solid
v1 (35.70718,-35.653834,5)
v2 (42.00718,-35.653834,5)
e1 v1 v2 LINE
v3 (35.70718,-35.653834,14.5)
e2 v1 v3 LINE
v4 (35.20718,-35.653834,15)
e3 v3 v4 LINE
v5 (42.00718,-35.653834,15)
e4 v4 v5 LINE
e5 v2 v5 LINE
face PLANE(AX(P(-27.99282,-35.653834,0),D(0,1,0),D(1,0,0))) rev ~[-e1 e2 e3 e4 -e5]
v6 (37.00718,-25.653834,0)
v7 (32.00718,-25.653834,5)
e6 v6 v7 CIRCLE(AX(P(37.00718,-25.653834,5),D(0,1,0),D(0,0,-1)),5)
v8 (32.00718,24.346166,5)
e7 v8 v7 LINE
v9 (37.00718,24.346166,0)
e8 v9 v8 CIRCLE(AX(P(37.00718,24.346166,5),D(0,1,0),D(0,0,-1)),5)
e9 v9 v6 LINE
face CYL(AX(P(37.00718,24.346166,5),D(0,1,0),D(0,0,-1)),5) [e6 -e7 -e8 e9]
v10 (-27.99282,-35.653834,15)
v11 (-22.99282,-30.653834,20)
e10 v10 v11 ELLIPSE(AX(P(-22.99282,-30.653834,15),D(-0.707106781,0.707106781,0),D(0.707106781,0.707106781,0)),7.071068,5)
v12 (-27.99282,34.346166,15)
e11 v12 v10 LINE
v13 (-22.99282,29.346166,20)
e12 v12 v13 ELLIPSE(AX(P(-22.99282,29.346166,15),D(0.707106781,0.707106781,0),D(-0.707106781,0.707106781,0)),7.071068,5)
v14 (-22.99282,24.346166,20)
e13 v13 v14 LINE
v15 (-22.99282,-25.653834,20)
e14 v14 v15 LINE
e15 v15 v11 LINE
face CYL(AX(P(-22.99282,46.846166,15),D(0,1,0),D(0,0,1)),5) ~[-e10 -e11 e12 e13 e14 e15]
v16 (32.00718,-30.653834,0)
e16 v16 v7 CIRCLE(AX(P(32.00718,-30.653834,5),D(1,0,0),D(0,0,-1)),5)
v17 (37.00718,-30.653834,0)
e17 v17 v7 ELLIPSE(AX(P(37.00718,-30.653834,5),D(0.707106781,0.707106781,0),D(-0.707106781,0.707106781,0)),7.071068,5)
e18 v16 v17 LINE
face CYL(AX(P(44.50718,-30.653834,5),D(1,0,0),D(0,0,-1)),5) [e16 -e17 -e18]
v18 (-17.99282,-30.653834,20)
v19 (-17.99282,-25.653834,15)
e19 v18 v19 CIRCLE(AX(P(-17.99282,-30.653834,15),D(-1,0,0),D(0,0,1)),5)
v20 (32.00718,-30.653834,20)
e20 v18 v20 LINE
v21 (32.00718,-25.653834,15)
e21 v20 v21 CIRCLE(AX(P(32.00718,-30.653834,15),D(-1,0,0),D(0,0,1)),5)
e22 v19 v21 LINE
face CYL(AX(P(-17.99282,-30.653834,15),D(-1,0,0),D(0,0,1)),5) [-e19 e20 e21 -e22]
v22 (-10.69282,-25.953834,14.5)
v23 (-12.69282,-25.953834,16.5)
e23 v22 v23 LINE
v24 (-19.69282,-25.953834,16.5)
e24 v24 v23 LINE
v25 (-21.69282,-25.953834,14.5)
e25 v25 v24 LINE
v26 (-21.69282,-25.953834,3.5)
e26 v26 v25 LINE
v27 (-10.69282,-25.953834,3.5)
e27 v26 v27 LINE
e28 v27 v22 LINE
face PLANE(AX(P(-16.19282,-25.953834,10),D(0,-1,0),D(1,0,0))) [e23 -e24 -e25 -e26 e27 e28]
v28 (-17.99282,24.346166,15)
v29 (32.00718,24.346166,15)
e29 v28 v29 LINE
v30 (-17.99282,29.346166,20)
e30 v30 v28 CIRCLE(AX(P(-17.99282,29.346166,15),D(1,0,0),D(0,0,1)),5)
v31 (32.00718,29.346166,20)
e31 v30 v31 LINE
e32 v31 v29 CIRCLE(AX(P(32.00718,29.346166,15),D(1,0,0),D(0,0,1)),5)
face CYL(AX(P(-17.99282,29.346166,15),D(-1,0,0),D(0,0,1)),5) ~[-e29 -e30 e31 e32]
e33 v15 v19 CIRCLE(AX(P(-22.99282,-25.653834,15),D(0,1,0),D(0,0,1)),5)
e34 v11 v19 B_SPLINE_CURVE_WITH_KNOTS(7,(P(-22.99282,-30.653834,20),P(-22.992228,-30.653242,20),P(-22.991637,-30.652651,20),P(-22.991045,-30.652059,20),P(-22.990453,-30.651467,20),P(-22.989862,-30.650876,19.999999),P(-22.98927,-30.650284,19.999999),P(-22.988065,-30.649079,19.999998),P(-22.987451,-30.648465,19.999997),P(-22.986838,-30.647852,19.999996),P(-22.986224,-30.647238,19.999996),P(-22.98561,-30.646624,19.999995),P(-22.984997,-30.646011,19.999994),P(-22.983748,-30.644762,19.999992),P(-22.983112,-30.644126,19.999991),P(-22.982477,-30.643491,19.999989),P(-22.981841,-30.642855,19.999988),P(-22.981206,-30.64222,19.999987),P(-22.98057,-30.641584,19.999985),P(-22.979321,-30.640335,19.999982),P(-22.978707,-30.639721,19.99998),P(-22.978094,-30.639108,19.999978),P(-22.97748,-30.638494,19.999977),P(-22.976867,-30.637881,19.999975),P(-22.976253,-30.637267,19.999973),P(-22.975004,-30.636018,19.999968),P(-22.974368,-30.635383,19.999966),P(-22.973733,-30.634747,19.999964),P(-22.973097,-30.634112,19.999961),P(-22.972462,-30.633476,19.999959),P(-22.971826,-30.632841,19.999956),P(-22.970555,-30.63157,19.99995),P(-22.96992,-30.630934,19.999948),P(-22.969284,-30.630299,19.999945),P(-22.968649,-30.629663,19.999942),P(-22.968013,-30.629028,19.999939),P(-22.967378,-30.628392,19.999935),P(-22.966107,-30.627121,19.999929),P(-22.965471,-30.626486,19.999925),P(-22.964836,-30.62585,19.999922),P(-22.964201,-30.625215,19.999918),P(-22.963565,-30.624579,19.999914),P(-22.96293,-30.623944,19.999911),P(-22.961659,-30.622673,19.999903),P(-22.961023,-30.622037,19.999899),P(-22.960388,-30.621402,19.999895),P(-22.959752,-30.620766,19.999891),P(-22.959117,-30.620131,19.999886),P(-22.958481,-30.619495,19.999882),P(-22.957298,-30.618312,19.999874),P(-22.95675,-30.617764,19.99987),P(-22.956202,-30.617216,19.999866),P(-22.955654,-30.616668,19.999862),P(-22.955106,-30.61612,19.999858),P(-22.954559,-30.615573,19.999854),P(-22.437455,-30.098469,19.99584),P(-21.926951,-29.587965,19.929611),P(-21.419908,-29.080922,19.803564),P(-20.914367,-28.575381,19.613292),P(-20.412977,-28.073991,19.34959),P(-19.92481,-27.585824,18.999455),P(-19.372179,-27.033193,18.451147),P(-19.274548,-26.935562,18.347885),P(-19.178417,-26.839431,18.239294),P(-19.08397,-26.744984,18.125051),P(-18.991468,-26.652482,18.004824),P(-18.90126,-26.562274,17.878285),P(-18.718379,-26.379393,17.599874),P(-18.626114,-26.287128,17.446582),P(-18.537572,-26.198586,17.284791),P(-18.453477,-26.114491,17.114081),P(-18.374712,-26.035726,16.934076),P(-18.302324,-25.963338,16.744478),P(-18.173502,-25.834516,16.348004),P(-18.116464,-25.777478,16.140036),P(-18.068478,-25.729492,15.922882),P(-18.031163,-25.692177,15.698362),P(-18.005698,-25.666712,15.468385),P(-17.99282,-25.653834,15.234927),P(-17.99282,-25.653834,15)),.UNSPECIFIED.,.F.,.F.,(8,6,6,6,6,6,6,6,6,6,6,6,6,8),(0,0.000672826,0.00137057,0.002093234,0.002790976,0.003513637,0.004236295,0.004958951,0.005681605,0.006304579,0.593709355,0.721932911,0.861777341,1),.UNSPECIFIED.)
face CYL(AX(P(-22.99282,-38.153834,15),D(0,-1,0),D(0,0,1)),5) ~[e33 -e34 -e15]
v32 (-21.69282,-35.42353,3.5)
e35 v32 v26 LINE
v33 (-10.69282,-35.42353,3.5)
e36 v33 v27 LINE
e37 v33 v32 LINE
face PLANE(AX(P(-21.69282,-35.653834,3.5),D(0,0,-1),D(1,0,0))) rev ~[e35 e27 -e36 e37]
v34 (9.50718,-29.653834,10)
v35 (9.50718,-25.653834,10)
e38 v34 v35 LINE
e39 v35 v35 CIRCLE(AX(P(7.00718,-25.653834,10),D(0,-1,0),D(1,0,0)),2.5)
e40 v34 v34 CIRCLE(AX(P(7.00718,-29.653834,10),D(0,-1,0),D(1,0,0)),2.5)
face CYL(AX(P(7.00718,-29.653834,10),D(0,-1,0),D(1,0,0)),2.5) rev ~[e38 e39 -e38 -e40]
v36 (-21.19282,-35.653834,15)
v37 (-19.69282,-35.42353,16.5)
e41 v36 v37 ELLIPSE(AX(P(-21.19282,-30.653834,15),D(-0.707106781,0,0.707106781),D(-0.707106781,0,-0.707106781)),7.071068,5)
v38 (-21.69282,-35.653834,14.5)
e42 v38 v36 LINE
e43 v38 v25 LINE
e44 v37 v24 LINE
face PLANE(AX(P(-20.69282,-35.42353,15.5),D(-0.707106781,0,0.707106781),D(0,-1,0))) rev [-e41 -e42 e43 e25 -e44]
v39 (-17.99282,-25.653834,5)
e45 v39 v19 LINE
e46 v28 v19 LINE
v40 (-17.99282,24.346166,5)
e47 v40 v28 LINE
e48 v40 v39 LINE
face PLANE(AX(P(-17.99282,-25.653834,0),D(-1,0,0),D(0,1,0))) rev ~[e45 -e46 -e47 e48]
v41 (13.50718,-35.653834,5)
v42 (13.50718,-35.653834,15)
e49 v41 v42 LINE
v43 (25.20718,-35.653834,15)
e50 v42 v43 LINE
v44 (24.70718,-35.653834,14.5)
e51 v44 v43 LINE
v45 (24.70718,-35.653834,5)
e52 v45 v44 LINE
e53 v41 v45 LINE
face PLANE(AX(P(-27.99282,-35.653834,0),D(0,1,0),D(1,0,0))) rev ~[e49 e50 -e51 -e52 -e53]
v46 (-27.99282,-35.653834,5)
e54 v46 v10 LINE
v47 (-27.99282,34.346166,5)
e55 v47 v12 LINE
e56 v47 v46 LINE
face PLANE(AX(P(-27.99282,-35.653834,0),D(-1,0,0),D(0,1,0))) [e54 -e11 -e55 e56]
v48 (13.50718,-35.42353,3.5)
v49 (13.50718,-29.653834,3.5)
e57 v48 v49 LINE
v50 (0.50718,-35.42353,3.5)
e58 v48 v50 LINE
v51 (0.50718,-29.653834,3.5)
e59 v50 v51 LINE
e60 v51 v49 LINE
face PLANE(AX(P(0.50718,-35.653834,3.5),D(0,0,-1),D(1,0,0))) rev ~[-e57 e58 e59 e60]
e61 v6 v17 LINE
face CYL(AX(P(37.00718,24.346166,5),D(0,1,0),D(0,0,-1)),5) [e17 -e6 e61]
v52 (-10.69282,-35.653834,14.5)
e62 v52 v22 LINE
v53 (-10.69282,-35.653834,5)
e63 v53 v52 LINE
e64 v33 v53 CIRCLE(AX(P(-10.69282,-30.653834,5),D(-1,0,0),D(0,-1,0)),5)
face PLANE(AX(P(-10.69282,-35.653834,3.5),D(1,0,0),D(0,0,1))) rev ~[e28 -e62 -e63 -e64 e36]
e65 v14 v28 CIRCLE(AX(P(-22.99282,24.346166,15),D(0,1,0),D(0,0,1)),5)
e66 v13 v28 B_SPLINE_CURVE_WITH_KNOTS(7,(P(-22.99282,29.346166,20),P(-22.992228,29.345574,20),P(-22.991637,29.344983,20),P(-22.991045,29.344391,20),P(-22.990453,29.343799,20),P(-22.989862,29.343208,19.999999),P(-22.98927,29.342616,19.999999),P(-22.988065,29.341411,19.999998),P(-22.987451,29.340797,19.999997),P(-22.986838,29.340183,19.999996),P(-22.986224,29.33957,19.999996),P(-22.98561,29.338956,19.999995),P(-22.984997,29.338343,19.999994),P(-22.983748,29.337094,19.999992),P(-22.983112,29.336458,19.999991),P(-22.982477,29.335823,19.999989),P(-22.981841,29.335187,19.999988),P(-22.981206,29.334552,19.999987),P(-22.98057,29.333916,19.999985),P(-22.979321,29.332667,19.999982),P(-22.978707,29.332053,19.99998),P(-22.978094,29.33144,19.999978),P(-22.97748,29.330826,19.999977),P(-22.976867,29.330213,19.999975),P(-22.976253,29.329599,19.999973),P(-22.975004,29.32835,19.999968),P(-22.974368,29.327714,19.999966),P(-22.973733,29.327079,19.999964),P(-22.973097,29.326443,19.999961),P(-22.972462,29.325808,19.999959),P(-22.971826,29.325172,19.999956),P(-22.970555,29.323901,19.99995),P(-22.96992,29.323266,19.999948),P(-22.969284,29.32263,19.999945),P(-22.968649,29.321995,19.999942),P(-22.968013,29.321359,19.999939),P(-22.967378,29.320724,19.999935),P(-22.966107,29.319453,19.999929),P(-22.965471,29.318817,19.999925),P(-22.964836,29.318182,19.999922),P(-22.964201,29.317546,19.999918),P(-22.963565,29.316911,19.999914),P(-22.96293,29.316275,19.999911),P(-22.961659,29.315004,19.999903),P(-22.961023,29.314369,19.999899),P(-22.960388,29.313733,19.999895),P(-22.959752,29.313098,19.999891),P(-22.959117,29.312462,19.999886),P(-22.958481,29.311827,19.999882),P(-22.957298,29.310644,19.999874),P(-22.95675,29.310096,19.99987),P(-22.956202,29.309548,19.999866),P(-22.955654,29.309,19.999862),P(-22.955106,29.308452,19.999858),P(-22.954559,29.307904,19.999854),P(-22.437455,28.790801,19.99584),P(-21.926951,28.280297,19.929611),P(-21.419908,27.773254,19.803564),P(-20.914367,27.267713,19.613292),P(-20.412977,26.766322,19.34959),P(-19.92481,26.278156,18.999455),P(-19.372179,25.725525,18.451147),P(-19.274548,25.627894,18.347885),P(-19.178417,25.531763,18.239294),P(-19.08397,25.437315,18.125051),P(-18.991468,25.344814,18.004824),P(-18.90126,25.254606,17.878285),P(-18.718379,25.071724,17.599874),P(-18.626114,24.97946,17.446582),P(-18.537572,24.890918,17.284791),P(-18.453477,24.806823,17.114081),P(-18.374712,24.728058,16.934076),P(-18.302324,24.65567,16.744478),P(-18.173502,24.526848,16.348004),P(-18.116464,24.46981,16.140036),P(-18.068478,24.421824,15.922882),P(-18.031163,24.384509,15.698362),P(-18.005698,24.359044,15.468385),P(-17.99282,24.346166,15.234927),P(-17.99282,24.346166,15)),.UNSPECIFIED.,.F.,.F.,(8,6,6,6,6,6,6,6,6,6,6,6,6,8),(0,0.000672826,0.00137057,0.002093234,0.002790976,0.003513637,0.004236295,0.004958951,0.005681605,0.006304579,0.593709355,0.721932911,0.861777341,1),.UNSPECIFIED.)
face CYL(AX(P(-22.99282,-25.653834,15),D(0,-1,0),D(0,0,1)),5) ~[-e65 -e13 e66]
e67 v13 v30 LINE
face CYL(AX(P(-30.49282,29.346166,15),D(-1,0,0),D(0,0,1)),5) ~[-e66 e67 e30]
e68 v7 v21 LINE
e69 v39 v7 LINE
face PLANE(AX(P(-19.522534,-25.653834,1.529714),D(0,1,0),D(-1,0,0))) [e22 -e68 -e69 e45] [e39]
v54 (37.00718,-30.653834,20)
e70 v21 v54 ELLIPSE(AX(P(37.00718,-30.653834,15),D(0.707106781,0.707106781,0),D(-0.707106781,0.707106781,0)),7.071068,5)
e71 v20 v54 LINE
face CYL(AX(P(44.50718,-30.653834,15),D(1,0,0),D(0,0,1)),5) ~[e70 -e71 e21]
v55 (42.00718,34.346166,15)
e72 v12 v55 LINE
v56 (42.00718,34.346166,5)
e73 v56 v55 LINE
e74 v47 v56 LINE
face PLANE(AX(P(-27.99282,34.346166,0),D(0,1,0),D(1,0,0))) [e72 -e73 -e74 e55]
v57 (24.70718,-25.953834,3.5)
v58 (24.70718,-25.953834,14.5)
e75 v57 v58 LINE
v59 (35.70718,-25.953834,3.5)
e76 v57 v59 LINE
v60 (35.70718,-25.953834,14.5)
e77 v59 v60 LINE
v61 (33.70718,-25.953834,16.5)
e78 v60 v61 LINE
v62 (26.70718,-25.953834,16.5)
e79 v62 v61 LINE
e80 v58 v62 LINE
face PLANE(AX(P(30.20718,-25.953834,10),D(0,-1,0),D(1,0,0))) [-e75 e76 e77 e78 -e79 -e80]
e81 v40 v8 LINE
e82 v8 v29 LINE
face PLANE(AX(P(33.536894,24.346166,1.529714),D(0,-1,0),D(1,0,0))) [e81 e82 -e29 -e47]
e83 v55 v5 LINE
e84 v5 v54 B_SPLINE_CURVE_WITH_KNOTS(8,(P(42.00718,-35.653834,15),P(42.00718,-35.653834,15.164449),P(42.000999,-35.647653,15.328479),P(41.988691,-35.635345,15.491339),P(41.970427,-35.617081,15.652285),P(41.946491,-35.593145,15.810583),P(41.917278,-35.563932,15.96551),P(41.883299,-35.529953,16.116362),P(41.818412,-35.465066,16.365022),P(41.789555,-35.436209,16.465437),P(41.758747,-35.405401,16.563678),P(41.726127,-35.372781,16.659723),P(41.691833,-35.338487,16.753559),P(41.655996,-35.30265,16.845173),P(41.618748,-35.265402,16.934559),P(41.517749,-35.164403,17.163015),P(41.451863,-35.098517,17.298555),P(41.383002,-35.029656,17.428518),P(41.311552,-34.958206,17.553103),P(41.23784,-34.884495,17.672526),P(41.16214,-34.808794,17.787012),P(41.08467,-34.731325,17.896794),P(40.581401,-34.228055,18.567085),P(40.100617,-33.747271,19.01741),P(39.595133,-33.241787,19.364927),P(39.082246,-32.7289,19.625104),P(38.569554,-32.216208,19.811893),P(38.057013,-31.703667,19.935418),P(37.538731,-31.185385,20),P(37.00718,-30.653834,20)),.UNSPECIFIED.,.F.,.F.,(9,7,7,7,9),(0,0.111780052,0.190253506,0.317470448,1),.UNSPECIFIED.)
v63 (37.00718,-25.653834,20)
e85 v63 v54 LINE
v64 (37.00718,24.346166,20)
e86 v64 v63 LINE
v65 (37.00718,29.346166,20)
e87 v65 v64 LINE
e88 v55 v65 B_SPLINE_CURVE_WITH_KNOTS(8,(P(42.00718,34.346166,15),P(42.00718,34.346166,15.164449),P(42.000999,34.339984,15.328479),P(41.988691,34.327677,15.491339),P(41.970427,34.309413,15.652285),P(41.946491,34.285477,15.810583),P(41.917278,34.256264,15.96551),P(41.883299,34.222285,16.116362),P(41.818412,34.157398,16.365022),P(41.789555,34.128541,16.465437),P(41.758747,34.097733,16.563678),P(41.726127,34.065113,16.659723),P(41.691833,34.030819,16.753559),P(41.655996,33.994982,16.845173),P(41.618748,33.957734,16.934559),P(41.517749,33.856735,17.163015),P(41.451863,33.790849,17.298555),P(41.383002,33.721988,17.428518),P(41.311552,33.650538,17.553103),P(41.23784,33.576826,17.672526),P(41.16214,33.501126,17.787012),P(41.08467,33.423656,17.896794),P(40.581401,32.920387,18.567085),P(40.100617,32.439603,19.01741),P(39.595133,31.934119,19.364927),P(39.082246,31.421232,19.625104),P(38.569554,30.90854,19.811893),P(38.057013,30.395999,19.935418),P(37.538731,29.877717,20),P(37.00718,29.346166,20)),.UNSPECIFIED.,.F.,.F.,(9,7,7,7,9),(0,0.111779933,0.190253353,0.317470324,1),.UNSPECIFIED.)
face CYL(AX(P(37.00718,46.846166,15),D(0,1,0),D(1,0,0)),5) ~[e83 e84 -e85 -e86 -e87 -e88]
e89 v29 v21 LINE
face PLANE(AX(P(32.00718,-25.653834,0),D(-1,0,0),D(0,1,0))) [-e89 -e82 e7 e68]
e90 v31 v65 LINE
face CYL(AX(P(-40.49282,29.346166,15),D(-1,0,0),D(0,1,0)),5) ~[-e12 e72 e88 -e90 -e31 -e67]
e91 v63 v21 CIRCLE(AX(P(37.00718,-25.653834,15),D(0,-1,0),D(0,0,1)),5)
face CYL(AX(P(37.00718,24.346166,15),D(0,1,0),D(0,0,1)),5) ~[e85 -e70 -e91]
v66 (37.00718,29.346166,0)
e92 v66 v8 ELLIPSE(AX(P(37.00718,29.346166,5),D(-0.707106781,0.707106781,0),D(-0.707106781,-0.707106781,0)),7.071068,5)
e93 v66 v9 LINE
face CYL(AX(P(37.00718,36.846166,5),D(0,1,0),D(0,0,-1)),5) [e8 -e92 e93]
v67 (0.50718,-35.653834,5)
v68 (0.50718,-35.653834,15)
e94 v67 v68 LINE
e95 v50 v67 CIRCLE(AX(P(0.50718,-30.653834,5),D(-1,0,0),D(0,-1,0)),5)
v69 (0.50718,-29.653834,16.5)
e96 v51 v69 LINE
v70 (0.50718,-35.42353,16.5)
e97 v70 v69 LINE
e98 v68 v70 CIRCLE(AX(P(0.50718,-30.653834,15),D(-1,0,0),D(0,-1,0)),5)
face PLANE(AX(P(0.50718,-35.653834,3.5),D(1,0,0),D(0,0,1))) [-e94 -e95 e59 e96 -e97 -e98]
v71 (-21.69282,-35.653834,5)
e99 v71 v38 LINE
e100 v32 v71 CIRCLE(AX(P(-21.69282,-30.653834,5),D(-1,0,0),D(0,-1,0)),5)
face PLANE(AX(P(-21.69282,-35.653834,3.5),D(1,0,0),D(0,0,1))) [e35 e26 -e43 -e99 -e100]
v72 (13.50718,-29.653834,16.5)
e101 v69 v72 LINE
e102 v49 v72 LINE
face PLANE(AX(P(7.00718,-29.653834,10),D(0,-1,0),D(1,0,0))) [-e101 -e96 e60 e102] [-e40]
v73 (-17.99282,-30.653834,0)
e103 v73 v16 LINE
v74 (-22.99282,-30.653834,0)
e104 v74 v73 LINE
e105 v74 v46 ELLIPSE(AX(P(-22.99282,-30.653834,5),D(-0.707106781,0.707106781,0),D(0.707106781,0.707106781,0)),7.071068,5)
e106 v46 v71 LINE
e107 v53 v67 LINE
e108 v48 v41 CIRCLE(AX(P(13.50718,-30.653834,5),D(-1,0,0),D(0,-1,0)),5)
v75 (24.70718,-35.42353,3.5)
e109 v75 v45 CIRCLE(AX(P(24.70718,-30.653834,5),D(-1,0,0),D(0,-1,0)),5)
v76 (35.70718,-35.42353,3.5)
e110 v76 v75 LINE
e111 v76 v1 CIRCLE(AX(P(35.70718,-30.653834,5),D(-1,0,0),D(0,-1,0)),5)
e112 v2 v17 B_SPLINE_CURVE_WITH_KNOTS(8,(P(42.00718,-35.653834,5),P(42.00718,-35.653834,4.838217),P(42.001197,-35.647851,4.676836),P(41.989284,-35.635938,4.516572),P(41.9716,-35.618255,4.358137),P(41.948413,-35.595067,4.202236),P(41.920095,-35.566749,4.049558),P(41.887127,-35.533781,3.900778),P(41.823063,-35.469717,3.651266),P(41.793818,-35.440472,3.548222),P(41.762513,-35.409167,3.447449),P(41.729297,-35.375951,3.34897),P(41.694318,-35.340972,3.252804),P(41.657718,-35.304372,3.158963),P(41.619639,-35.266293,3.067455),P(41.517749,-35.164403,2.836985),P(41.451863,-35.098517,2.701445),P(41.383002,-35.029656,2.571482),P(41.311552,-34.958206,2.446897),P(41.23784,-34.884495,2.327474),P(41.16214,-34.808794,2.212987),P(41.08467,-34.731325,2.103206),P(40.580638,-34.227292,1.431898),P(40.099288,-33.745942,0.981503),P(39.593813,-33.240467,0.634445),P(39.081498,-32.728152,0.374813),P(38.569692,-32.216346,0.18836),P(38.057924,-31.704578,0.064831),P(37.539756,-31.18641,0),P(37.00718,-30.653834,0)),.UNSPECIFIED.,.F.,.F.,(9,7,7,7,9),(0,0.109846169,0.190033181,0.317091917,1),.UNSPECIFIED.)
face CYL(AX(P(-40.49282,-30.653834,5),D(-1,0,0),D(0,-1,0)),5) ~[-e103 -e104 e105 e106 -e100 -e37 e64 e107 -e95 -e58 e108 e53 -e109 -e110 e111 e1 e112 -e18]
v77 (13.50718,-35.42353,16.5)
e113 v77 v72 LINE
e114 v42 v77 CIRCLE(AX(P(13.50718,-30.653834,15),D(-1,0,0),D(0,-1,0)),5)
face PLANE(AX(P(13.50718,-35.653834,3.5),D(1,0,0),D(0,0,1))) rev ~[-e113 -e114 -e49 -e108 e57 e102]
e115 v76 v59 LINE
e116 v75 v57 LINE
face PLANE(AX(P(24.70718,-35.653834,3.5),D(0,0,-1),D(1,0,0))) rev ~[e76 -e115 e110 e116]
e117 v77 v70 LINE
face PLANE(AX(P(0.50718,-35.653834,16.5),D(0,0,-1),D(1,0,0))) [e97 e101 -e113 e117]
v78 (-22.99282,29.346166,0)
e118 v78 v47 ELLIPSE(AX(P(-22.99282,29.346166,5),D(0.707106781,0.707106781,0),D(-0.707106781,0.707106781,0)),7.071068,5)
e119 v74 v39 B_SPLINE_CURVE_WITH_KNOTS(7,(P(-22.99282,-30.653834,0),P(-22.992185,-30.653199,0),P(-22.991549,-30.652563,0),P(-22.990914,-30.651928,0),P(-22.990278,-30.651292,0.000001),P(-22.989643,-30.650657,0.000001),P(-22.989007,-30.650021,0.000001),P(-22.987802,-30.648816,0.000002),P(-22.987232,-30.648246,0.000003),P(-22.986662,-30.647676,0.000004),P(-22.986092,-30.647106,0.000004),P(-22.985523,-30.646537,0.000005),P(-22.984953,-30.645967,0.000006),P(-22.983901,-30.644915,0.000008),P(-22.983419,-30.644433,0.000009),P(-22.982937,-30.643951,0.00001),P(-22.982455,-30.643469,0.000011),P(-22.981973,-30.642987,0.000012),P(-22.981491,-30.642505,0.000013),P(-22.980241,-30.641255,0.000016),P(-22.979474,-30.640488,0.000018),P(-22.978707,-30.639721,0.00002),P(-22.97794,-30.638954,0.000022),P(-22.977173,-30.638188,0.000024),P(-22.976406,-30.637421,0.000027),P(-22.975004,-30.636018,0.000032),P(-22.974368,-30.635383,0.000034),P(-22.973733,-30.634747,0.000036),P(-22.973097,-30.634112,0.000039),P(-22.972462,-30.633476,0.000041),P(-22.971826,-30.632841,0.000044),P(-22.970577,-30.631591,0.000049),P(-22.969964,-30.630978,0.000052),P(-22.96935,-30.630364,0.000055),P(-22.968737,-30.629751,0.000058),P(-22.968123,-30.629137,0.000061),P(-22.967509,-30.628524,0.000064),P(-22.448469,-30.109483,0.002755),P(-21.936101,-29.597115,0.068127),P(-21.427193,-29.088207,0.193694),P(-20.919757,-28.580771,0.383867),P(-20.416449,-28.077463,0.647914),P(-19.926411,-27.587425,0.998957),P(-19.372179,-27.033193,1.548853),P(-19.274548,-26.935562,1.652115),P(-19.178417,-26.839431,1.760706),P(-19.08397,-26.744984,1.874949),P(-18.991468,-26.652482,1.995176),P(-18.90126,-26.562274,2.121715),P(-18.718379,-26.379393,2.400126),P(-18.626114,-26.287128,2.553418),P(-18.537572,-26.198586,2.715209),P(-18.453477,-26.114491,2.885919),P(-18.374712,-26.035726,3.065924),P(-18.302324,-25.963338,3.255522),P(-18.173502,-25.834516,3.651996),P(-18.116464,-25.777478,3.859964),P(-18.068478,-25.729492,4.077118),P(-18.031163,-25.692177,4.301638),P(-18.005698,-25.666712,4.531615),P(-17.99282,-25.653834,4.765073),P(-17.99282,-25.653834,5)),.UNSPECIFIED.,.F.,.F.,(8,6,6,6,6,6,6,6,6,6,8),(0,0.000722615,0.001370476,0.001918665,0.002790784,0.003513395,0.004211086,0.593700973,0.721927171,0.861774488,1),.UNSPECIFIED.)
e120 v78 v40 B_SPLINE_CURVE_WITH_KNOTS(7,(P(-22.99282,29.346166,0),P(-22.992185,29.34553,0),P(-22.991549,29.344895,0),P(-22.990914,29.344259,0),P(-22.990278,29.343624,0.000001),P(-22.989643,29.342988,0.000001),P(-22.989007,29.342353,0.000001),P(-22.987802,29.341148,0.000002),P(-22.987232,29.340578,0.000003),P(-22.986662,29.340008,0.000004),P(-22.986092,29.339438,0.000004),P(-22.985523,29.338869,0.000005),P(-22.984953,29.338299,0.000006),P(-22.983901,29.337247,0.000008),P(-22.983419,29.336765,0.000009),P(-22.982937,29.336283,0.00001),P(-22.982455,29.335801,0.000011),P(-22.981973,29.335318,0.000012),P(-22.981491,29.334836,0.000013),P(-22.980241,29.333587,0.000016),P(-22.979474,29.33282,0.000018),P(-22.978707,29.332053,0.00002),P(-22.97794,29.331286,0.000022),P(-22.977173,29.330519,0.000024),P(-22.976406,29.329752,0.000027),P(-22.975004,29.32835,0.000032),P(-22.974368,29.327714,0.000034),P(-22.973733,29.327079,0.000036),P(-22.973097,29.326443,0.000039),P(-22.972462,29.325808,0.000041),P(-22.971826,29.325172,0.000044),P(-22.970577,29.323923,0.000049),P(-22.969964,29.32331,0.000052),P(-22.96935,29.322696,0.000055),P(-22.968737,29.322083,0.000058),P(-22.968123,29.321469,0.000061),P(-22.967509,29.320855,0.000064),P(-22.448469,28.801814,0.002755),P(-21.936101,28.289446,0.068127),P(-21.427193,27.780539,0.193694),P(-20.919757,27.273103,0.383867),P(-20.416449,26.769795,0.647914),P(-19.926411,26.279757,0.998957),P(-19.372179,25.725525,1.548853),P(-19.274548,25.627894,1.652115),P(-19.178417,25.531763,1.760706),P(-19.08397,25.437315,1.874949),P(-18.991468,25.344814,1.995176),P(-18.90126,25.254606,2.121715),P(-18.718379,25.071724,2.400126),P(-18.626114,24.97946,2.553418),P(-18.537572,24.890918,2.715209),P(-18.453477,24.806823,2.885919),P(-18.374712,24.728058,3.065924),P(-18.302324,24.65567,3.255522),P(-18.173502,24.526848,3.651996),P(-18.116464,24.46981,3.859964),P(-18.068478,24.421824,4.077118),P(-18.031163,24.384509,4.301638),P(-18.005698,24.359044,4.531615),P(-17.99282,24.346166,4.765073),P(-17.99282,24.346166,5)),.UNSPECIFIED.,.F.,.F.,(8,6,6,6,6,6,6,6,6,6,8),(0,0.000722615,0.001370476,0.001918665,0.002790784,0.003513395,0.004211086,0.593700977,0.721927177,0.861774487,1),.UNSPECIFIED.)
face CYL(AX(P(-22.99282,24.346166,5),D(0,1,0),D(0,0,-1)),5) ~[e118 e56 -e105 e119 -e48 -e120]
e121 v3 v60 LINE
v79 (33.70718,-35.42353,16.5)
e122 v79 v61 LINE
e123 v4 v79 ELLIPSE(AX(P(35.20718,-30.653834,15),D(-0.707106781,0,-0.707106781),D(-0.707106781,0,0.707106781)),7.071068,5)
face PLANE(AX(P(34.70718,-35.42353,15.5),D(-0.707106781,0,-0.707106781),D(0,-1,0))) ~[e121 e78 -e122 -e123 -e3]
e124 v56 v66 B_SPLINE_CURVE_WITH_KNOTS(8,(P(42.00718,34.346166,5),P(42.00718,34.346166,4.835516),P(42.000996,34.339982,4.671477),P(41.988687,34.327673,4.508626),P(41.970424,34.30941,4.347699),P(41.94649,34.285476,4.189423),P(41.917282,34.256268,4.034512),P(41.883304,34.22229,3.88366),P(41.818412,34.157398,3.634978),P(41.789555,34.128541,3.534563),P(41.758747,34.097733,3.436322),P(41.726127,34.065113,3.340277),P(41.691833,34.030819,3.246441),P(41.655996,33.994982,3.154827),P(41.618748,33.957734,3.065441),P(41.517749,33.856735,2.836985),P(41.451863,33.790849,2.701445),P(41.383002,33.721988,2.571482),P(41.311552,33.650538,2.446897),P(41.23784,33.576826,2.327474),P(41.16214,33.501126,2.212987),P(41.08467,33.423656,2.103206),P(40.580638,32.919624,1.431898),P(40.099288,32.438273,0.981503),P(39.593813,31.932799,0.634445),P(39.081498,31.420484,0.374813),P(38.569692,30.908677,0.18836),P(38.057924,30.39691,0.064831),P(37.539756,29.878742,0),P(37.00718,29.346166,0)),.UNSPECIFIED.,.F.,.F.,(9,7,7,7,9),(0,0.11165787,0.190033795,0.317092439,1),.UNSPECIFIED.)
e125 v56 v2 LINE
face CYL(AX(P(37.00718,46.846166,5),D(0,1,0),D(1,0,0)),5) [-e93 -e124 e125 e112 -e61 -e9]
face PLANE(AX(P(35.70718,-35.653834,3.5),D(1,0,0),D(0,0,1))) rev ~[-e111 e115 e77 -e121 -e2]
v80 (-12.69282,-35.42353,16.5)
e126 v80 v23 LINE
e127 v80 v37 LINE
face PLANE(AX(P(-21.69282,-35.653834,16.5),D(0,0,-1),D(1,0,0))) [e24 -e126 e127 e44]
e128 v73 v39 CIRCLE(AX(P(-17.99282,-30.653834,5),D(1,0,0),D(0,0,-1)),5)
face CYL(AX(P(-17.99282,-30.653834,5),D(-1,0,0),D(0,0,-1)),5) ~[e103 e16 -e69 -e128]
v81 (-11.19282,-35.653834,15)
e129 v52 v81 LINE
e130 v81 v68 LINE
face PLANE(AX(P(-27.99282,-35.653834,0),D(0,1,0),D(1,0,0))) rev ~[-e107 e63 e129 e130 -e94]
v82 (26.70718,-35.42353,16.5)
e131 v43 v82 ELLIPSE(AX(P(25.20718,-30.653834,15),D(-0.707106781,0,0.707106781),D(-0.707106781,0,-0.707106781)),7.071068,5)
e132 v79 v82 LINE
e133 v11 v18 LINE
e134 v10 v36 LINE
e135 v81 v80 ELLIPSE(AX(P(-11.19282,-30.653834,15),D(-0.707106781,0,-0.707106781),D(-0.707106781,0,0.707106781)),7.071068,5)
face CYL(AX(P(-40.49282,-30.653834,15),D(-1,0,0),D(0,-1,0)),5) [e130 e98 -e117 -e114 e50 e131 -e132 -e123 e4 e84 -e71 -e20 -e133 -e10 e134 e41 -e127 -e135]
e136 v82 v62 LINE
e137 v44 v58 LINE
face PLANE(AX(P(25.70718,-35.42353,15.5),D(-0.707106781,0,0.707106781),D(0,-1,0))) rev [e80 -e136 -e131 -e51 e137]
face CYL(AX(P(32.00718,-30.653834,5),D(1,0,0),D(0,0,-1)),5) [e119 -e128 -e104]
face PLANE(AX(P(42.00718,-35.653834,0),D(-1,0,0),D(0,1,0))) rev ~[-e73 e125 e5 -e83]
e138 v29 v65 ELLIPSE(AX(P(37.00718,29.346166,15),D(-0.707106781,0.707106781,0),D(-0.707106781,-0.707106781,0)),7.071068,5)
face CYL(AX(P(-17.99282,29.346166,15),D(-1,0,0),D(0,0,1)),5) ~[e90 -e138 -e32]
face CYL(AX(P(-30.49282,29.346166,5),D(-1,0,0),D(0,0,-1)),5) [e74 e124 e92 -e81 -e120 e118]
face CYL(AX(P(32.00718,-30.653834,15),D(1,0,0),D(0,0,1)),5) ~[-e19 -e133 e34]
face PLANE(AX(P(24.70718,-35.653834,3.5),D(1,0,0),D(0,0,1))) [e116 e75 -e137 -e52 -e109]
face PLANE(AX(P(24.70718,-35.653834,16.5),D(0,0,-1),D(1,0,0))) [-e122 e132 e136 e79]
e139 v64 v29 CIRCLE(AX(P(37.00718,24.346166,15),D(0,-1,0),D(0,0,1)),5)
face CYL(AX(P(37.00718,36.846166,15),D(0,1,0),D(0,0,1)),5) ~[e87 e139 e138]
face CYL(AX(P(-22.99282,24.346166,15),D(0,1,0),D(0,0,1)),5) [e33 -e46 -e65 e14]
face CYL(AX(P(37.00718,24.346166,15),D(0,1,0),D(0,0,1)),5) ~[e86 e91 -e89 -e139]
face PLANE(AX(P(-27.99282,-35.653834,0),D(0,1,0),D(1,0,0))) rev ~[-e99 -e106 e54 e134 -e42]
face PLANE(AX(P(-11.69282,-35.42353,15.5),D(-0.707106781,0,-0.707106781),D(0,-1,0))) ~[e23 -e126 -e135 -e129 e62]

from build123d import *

# Parameters (mm, degrees)
F0_W         = 70
F0_H         = 70
F0_W_2       = 50
F0_H_2       = 50
F1_DEPTH     = 20
F2_W         = 13
F2_H         = 13
F3_DEPTH     = 6
F4_T1_DEPTH  = 95
F4_T3_DEPTH  = 95
F4_T5_DEPTH  = 50
F4_T7_DEPTH  = 50
F4_T13_DEPTH = 62.5
F4_T17_DEPTH = 62.5
F4_T24_DEPTH = 62.5
F4_T28_DEPTH = 62.5
F4_T35_DEPTH = 62.5
F4_T39_DEPTH = 62.5
F4_T46_DEPTH = 62.5
F4_T50_DEPTH = 62.5
F4_T57_DEPTH = 62.5
F4_T61_DEPTH = 62.5
F4_T68_DEPTH = 62.5
F4_T72_DEPTH = 62.5
F4_T79_DEPTH = 62.5
F4_T83_DEPTH = 62.5
F4_T90_DEPTH = 62.5
F4_T94_DEPTH = 62.5
F5_R         = 2.5
F6_DEPTH     = 25
F7_W         = 11
F7_H         = 13
F8_DEPTH     = 9.7
F9_SIZE      = 2
F10_SIZE     = 2


# Not quite as in the source:
# - a fillet or chamfer that OpenCascade refuses, or shapes differently, is made with other operations: its cross-section is extruded or revolved along the edge and cut away or added


with BuildPart() as f1:
    # F0 (on Top) → F1 (new body)
    with BuildSketch(Plane.XY):
        with Locations((7.0071799593, -0.6538340822)):
            Rectangle(F0_W, F0_H)
        with Locations((7.0071799593, -0.6538340822)):
            Rectangle(F0_W_2, F0_H_2, mode=Mode.SUBTRACT)
    extrude(amount=F1_DEPTH)

    # F2 (on face) → F3 (cut)
    with BuildSketch(Plane.XZ.offset(35.6538340822)):
        with Locations((7.0071799593, 10)):
            Rectangle(F2_W, F2_H)
    extrude(amount=-F3_DEPTH, mode=Mode.SUBTRACT)

    # F4: fillet of radius 5 on 16 edges, made by hand

    # F4_s2 → F4_t1 (cut)
    with BuildSketch(Plane.XZ.offset(-46.8461659178)):
        with BuildLine():
            ThreePointArc((42.0071799593, 5), (40.5427138653, 1.4644660941), (37.0071799593, 0))
            Line((37.0071799593, 0), (42.0071799593, 0))
            Line((42.0071799593, 0), (42.0071799593, 5))
        make_face()
        with BuildLine():
            ThreePointArc((42.0071799593, 15), (40.5427138653, 18.5355339059), (37.0071799593, 20))
            Line((37.0071799593, 20), (42.0071799593, 20))
            Line((42.0071799593, 20), (42.0071799593, 15))
        make_face()
        with BuildLine():
            ThreePointArc((-22.9928200407, 0), (-26.5283539466, 1.4644660941), (-27.9928200407, 5))
            Line((-27.9928200407, 5), (-27.9928200407, 0))
            Line((-27.9928200407, 0), (-22.9928200407, 0))
        make_face()
        with BuildLine():
            ThreePointArc((-22.9928200407, 20), (-26.5283539466, 18.5355339059), (-27.9928200407, 15))
            Line((-27.9928200407, 15), (-27.9928200407, 20))
            Line((-27.9928200407, 20), (-22.9928200407, 20))
        make_face()
    extrude(amount=F4_T1_DEPTH, mode=Mode.SUBTRACT)

    # F4_s4 → F4_t3 (cut)
    with BuildSketch(Plane.YZ.offset(-40.4928200407)):
        with BuildLine():
            ThreePointArc((-35.6538340822, 5), (-34.1893679881, 1.4644660941), (-30.6538340822, 0))
            Line((-30.6538340822, 0), (-35.6538340822, 0))
            Line((-35.6538340822, 0), (-35.6538340822, 5))
        make_face()
        with BuildLine():
            ThreePointArc((-35.6538340822, 15), (-34.1893679881, 18.5355339059), (-30.6538340822, 20))
            Line((-30.6538340822, 20), (-35.6538340822, 20))
            Line((-35.6538340822, 20), (-35.6538340822, 15))
        make_face()
        with BuildLine():
            ThreePointArc((34.3461659178, 5), (32.8816998237, 1.4644660941), (29.3461659178, 0))
            Line((29.3461659178, 0), (34.3461659178, 0))
            Line((34.3461659178, 0), (34.3461659178, 5))
        make_face()
        with BuildLine():
            ThreePointArc((34.3461659178, 15), (32.8816998237, 18.5355339059), (29.3461659178, 20))
            Line((29.3461659178, 20), (34.3461659178, 20))
            Line((34.3461659178, 20), (34.3461659178, 15))
        make_face()
    extrude(amount=F4_T3_DEPTH, mode=Mode.SUBTRACT)

    # F4_s6 → F4_t5 (cut)
    with BuildSketch(Plane.XZ.offset(-24.3461659178)):
        with BuildLine():
            ThreePointArc((-22.9928200407, 0), (-19.4572861347, 1.4644660941), (-17.9928200407, 5))
            Line((-17.9928200407, 5), (-17.9928200407, 0))
            Line((-17.9928200407, 0), (-22.9928200407, 0))
        make_face()
        with BuildLine():
            ThreePointArc((37.0071799593, 0), (33.4716460534, 1.4644660941), (32.0071799593, 5))
            Line((32.0071799593, 5), (32.0071799593, 0))
            Line((32.0071799593, 0), (37.0071799593, 0))
        make_face()
        with BuildLine():
            ThreePointArc((-22.9928200407, 20), (-19.4572861347, 18.5355339059), (-17.9928200407, 15))
            Line((-17.9928200407, 15), (-17.9928200407, 20))
            Line((-17.9928200407, 20), (-22.9928200407, 20))
        make_face()
        with BuildLine():
            ThreePointArc((37.0071799593, 20), (33.4716460534, 18.5355339059), (32.0071799593, 15))
            Line((32.0071799593, 15), (32.0071799593, 20))
            Line((32.0071799593, 20), (37.0071799593, 20))
        make_face()
    extrude(amount=F4_T5_DEPTH, mode=Mode.SUBTRACT)

    # F4_s8 → F4_t7 (cut)
    with BuildSketch(Plane.YZ.offset(-17.9928200407)):
        with BuildLine():
            ThreePointArc((29.3461659178, 0), (25.8106320119, 1.4644660941), (24.3461659178, 5))
            Line((24.3461659178, 5), (24.3461659178, 0))
            Line((24.3461659178, 0), (29.3461659178, 0))
        make_face()
        with BuildLine():
            ThreePointArc((-30.6538340822, 0), (-27.1183001763, 1.4644660941), (-25.6538340822, 5))
            Line((-25.6538340822, 5), (-25.6538340822, 0))
            Line((-25.6538340822, 0), (-30.6538340822, 0))
        make_face()
        with BuildLine():
            ThreePointArc((29.3461659178, 20), (25.8106320119, 18.5355339059), (24.3461659178, 15))
            Line((24.3461659178, 15), (24.3461659178, 20))
            Line((24.3461659178, 20), (29.3461659178, 20))
        make_face()
        with BuildLine():
            ThreePointArc((-30.6538340822, 20), (-27.1183001763, 18.5355339059), (-25.6538340822, 15))
            Line((-25.6538340822, 15), (-25.6538340822, 20))
            Line((-25.6538340822, 20), (-30.6538340822, 20))
        make_face()
    extrude(amount=F4_T7_DEPTH, mode=Mode.SUBTRACT)


with BuildPart() as f4_tool11:
    # F4_s12 → F4_t13 (new body)
    with BuildSketch(Plane.XZ.offset(38.1538340822)):
        with BuildLine():
            ThreePointArc((-22.9928200407, 0), (-19.4572861347, 1.4644660941), (-17.9928200407, 5))
            Line((-17.9928200407, 5), (-17.9928200407, 0))
            Line((-17.9928200407, 0), (-22.9928200407, 0))
        make_face()
    extrude(amount=-F4_T13_DEPTH)

    split(bisect_by=Plane.XZ.offset(25.6538340822), keep=Keep.TOP)


with BuildPart() as f4_tool15:
    # F4_s16 → F4_t17 (new body)
    with BuildSketch(Plane.YZ.offset(32.0071799593)):
        with BuildLine():
            ThreePointArc((-30.6538340822, 0), (-27.1183001763, 1.4644660941), (-25.6538340822, 5))
            Line((-25.6538340822, 5), (-25.6538340822, 0))
            Line((-25.6538340822, 0), (-30.6538340822, 0))
        make_face()
    extrude(amount=-F4_T17_DEPTH)

    split(bisect_by=Plane.YZ.offset(-17.9928200407), keep=Keep.BOTTOM)


with BuildPart() as f4_tool11_1:
    add(f4_tool11.part)

    # F4_t19: intersect F4_tool15
    add(f4_tool15.part, mode=Mode.INTERSECT)


with BuildPart() as f1_1:
    add(f1.part)

    # F4_t9: cut F4_tool11
    add(f4_tool11_1.part, mode=Mode.SUBTRACT)


with BuildPart() as f4_tool22:
    # F4_s23 → F4_t24 (new body)
    with BuildSketch(Plane.XZ.offset(25.6538340822)):
        with BuildLine():
            ThreePointArc((-22.9928200407, 0), (-19.4572861347, 1.4644660941), (-17.9928200407, 5))
            Line((-17.9928200407, 5), (-17.9928200407, 0))
            Line((-17.9928200407, 0), (-22.9928200407, 0))
        make_face()
    extrude(amount=-F4_T24_DEPTH)

    split(bisect_by=Plane.XZ.offset(-24.3461659178), keep=Keep.BOTTOM)


with BuildPart() as f4_tool26:
    # F4_s27 → F4_t28 (new body)
    with BuildSketch(Plane.YZ.offset(-30.4928200407)):
        with BuildLine():
            ThreePointArc((29.3461659178, 0), (25.8106320119, 1.4644660941), (24.3461659178, 5))
            Line((24.3461659178, 5), (24.3461659178, 0))
            Line((24.3461659178, 0), (29.3461659178, 0))
        make_face()
    extrude(amount=F4_T28_DEPTH)

    split(bisect_by=Plane.YZ.offset(-17.9928200407), keep=Keep.BOTTOM)


with BuildPart() as f4_tool22_1:
    add(f4_tool22.part)

    # F4_t30: intersect F4_tool26
    add(f4_tool26.part, mode=Mode.INTERSECT)


with BuildPart() as f1_2:
    add(f1_1.part)

    # F4_t20: cut F4_tool22
    add(f4_tool22_1.part, mode=Mode.SUBTRACT)


with BuildPart() as f4_tool33:
    # F4_s34 → F4_t35 (new body)
    with BuildSketch(Plane.YZ.offset(-17.9928200407)):
        with BuildLine():
            ThreePointArc((29.3461659178, 0), (25.8106320119, 1.4644660941), (24.3461659178, 5))
            Line((24.3461659178, 5), (24.3461659178, 0))
            Line((24.3461659178, 0), (29.3461659178, 0))
        make_face()
    extrude(amount=F4_T35_DEPTH)

    split(bisect_by=Plane.YZ.offset(32.0071799593), keep=Keep.TOP)


with BuildPart() as f4_tool37:
    # F4_s38 → F4_t39 (new body)
    with BuildSketch(Plane.XZ.offset(-36.8461659178)):
        with BuildLine():
            ThreePointArc((37.0071799593, 0), (33.4716460534, 1.4644660941), (32.0071799593, 5))
            Line((32.0071799593, 5), (32.0071799593, 0))
            Line((32.0071799593, 0), (37.0071799593, 0))
        make_face()
    extrude(amount=F4_T39_DEPTH)

    split(bisect_by=Plane.XZ.offset(-24.3461659178), keep=Keep.BOTTOM)


with BuildPart() as f4_tool33_1:
    add(f4_tool33.part)

    # F4_t41: intersect F4_tool37
    add(f4_tool37.part, mode=Mode.INTERSECT)


with BuildPart() as f1_3:
    add(f1_2.part)

    # F4_t31: cut F4_tool33
    add(f4_tool33_1.part, mode=Mode.SUBTRACT)


with BuildPart() as f4_tool44:
    # F4_s45 → F4_t46 (new body)
    with BuildSketch(Plane.XZ.offset(-24.3461659178)):
        with BuildLine():
            ThreePointArc((37.0071799593, 0), (33.4716460534, 1.4644660941), (32.0071799593, 5))
            Line((32.0071799593, 5), (32.0071799593, 0))
            Line((32.0071799593, 0), (37.0071799593, 0))
        make_face()
    extrude(amount=F4_T46_DEPTH)

    split(bisect_by=Plane.XZ.offset(25.6538340822), keep=Keep.TOP)


with BuildPart() as f4_tool48:
    # F4_s49 → F4_t50 (new body)
    with BuildSketch(Plane.YZ.offset(44.5071799593)):
        with BuildLine():
            ThreePointArc((-30.6538340822, 0), (-27.1183001763, 1.4644660941), (-25.6538340822, 5))
            Line((-25.6538340822, 5), (-25.6538340822, 0))
            Line((-25.6538340822, 0), (-30.6538340822, 0))
        make_face()
    extrude(amount=-F4_T50_DEPTH)

    split(bisect_by=Plane.YZ.offset(32.0071799593), keep=Keep.TOP)


with BuildPart() as f4_tool44_1:
    add(f4_tool44.part)

    # F4_t52: intersect F4_tool48
    add(f4_tool48.part, mode=Mode.INTERSECT)


with BuildPart() as f1_4:
    add(f1_3.part)

    # F4_t42: cut F4_tool44
    add(f4_tool44_1.part, mode=Mode.SUBTRACT)


with BuildPart() as f4_tool55:
    # F4_s56 → F4_t57 (new body)
    with BuildSketch(Plane.XZ.offset(38.1538340822)):
        with BuildLine():
            ThreePointArc((-22.9928200407, 20), (-19.4572861347, 18.5355339059), (-17.9928200407, 15))
            Line((-17.9928200407, 15), (-17.9928200407, 20))
            Line((-17.9928200407, 20), (-22.9928200407, 20))
        make_face()
    extrude(amount=-F4_T57_DEPTH)

    split(bisect_by=Plane.XZ.offset(25.6538340822), keep=Keep.TOP)


with BuildPart() as f4_tool59:
    # F4_s60 → F4_t61 (new body)
    with BuildSketch(Plane.YZ.offset(32.0071799593)):
        with BuildLine():
            ThreePointArc((-30.6538340822, 20), (-27.1183001763, 18.5355339059), (-25.6538340822, 15))
            Line((-25.6538340822, 15), (-25.6538340822, 20))
            Line((-25.6538340822, 20), (-30.6538340822, 20))
        make_face()
    extrude(amount=-F4_T61_DEPTH)

    split(bisect_by=Plane.YZ.offset(-17.9928200407), keep=Keep.BOTTOM)


with BuildPart() as f4_tool55_1:
    add(f4_tool55.part)

    # F4_t63: intersect F4_tool59
    add(f4_tool59.part, mode=Mode.INTERSECT)


with BuildPart() as f1_5:
    add(f1_4.part)

    # F4_t53: cut F4_tool55
    add(f4_tool55_1.part, mode=Mode.SUBTRACT)


with BuildPart() as f4_tool66:
    # F4_s67 → F4_t68 (new body)
    with BuildSketch(Plane.XZ.offset(25.6538340822)):
        with BuildLine():
            ThreePointArc((-22.9928200407, 20), (-19.4572861347, 18.5355339059), (-17.9928200407, 15))
            Line((-17.9928200407, 15), (-17.9928200407, 20))
            Line((-17.9928200407, 20), (-22.9928200407, 20))
        make_face()
    extrude(amount=-F4_T68_DEPTH)

    split(bisect_by=Plane.XZ.offset(-24.3461659178), keep=Keep.BOTTOM)


with BuildPart() as f4_tool70:
    # F4_s71 → F4_t72 (new body)
    with BuildSketch(Plane.YZ.offset(-30.4928200407)):
        with BuildLine():
            ThreePointArc((29.3461659178, 20), (25.8106320119, 18.5355339059), (24.3461659178, 15))
            Line((24.3461659178, 15), (24.3461659178, 20))
            Line((24.3461659178, 20), (29.3461659178, 20))
        make_face()
    extrude(amount=F4_T72_DEPTH)

    split(bisect_by=Plane.YZ.offset(-17.9928200407), keep=Keep.BOTTOM)


with BuildPart() as f4_tool66_1:
    add(f4_tool66.part)

    # F4_t74: intersect F4_tool70
    add(f4_tool70.part, mode=Mode.INTERSECT)


with BuildPart() as f1_6:
    add(f1_5.part)

    # F4_t64: cut F4_tool66
    add(f4_tool66_1.part, mode=Mode.SUBTRACT)


with BuildPart() as f4_tool77:
    # F4_s78 → F4_t79 (new body)
    with BuildSketch(Plane.YZ.offset(-17.9928200407)):
        with BuildLine():
            ThreePointArc((29.3461659178, 20), (25.8106320119, 18.5355339059), (24.3461659178, 15))
            Line((24.3461659178, 15), (24.3461659178, 20))
            Line((24.3461659178, 20), (29.3461659178, 20))
        make_face()
    extrude(amount=F4_T79_DEPTH)

    split(bisect_by=Plane.YZ.offset(32.0071799593), keep=Keep.TOP)


with BuildPart() as f4_tool81:
    # F4_s82 → F4_t83 (new body)
    with BuildSketch(Plane.XZ.offset(-36.8461659178)):
        with BuildLine():
            ThreePointArc((37.0071799593, 20), (33.4716460534, 18.5355339059), (32.0071799593, 15))
            Line((32.0071799593, 15), (32.0071799593, 20))
            Line((32.0071799593, 20), (37.0071799593, 20))
        make_face()
    extrude(amount=F4_T83_DEPTH)

    split(bisect_by=Plane.XZ.offset(-24.3461659178), keep=Keep.BOTTOM)


with BuildPart() as f4_tool77_1:
    add(f4_tool77.part)

    # F4_t85: intersect F4_tool81
    add(f4_tool81.part, mode=Mode.INTERSECT)


with BuildPart() as f1_7:
    add(f1_6.part)

    # F4_t75: cut F4_tool77
    add(f4_tool77_1.part, mode=Mode.SUBTRACT)


with BuildPart() as f4_tool88:
    # F4_s89 → F4_t90 (new body)
    with BuildSketch(Plane.XZ.offset(-24.3461659178)):
        with BuildLine():
            ThreePointArc((37.0071799593, 20), (33.4716460534, 18.5355339059), (32.0071799593, 15))
            Line((32.0071799593, 15), (32.0071799593, 20))
            Line((32.0071799593, 20), (37.0071799593, 20))
        make_face()
    extrude(amount=F4_T90_DEPTH)

    split(bisect_by=Plane.XZ.offset(25.6538340822), keep=Keep.TOP)


with BuildPart() as f4_tool92:
    # F4_s93 → F4_t94 (new body)
    with BuildSketch(Plane.YZ.offset(44.5071799593)):
        with BuildLine():
            ThreePointArc((-30.6538340822, 20), (-27.1183001763, 18.5355339059), (-25.6538340822, 15))
            Line((-25.6538340822, 15), (-25.6538340822, 20))
            Line((-25.6538340822, 20), (-30.6538340822, 20))
        make_face()
    extrude(amount=-F4_T94_DEPTH)

    split(bisect_by=Plane.YZ.offset(32.0071799593), keep=Keep.TOP)


with BuildPart() as f4_tool88_1:
    add(f4_tool88.part)

    # F4_t96: intersect F4_tool92
    add(f4_tool92.part, mode=Mode.INTERSECT)


with BuildPart() as f1_8:
    add(f1_7.part)

    # F4_t86: cut F4_tool88
    add(f4_tool88_1.part, mode=Mode.SUBTRACT)

    # F5 (on face) → F6 (cut)
    with BuildSketch(Plane.XZ.offset(29.6538340822)):
        with Locations((7.0071799593, 10)):
            Circle(F5_R)
    extrude(amount=-F6_DEPTH, mode=Mode.SUBTRACT)

    # F7 (on face) → F8 (cut)
    with BuildSketch(Plane.XZ.offset(35.6538340822)):
        with Locations((-16.1928200407, 10)):
            Rectangle(F7_W, F7_H)
        with Locations((30.2071799593, 10)):
            Rectangle(F7_W, F7_H)
    extrude(amount=-F8_DEPTH, mode=Mode.SUBTRACT)

    # F9
    f9_edges = [f1_8.edges().sort_by_distance(p)[0] for p in [
        (-21.69282, -30.688682, 16.5),
        (-10.69282, -30.688682, 16.5),
    ]]
    chamfer(f9_edges, length=F9_SIZE)

    # F10
    f10_edges = [f1_8.edges().sort_by_distance(p)[0] for p in [
        (35.70718, -30.688682, 16.5),
        (24.70718, -30.688682, 16.5),
    ]]
    chamfer(f10_edges, length=F10_SIZE)


solid = f1_8.part
